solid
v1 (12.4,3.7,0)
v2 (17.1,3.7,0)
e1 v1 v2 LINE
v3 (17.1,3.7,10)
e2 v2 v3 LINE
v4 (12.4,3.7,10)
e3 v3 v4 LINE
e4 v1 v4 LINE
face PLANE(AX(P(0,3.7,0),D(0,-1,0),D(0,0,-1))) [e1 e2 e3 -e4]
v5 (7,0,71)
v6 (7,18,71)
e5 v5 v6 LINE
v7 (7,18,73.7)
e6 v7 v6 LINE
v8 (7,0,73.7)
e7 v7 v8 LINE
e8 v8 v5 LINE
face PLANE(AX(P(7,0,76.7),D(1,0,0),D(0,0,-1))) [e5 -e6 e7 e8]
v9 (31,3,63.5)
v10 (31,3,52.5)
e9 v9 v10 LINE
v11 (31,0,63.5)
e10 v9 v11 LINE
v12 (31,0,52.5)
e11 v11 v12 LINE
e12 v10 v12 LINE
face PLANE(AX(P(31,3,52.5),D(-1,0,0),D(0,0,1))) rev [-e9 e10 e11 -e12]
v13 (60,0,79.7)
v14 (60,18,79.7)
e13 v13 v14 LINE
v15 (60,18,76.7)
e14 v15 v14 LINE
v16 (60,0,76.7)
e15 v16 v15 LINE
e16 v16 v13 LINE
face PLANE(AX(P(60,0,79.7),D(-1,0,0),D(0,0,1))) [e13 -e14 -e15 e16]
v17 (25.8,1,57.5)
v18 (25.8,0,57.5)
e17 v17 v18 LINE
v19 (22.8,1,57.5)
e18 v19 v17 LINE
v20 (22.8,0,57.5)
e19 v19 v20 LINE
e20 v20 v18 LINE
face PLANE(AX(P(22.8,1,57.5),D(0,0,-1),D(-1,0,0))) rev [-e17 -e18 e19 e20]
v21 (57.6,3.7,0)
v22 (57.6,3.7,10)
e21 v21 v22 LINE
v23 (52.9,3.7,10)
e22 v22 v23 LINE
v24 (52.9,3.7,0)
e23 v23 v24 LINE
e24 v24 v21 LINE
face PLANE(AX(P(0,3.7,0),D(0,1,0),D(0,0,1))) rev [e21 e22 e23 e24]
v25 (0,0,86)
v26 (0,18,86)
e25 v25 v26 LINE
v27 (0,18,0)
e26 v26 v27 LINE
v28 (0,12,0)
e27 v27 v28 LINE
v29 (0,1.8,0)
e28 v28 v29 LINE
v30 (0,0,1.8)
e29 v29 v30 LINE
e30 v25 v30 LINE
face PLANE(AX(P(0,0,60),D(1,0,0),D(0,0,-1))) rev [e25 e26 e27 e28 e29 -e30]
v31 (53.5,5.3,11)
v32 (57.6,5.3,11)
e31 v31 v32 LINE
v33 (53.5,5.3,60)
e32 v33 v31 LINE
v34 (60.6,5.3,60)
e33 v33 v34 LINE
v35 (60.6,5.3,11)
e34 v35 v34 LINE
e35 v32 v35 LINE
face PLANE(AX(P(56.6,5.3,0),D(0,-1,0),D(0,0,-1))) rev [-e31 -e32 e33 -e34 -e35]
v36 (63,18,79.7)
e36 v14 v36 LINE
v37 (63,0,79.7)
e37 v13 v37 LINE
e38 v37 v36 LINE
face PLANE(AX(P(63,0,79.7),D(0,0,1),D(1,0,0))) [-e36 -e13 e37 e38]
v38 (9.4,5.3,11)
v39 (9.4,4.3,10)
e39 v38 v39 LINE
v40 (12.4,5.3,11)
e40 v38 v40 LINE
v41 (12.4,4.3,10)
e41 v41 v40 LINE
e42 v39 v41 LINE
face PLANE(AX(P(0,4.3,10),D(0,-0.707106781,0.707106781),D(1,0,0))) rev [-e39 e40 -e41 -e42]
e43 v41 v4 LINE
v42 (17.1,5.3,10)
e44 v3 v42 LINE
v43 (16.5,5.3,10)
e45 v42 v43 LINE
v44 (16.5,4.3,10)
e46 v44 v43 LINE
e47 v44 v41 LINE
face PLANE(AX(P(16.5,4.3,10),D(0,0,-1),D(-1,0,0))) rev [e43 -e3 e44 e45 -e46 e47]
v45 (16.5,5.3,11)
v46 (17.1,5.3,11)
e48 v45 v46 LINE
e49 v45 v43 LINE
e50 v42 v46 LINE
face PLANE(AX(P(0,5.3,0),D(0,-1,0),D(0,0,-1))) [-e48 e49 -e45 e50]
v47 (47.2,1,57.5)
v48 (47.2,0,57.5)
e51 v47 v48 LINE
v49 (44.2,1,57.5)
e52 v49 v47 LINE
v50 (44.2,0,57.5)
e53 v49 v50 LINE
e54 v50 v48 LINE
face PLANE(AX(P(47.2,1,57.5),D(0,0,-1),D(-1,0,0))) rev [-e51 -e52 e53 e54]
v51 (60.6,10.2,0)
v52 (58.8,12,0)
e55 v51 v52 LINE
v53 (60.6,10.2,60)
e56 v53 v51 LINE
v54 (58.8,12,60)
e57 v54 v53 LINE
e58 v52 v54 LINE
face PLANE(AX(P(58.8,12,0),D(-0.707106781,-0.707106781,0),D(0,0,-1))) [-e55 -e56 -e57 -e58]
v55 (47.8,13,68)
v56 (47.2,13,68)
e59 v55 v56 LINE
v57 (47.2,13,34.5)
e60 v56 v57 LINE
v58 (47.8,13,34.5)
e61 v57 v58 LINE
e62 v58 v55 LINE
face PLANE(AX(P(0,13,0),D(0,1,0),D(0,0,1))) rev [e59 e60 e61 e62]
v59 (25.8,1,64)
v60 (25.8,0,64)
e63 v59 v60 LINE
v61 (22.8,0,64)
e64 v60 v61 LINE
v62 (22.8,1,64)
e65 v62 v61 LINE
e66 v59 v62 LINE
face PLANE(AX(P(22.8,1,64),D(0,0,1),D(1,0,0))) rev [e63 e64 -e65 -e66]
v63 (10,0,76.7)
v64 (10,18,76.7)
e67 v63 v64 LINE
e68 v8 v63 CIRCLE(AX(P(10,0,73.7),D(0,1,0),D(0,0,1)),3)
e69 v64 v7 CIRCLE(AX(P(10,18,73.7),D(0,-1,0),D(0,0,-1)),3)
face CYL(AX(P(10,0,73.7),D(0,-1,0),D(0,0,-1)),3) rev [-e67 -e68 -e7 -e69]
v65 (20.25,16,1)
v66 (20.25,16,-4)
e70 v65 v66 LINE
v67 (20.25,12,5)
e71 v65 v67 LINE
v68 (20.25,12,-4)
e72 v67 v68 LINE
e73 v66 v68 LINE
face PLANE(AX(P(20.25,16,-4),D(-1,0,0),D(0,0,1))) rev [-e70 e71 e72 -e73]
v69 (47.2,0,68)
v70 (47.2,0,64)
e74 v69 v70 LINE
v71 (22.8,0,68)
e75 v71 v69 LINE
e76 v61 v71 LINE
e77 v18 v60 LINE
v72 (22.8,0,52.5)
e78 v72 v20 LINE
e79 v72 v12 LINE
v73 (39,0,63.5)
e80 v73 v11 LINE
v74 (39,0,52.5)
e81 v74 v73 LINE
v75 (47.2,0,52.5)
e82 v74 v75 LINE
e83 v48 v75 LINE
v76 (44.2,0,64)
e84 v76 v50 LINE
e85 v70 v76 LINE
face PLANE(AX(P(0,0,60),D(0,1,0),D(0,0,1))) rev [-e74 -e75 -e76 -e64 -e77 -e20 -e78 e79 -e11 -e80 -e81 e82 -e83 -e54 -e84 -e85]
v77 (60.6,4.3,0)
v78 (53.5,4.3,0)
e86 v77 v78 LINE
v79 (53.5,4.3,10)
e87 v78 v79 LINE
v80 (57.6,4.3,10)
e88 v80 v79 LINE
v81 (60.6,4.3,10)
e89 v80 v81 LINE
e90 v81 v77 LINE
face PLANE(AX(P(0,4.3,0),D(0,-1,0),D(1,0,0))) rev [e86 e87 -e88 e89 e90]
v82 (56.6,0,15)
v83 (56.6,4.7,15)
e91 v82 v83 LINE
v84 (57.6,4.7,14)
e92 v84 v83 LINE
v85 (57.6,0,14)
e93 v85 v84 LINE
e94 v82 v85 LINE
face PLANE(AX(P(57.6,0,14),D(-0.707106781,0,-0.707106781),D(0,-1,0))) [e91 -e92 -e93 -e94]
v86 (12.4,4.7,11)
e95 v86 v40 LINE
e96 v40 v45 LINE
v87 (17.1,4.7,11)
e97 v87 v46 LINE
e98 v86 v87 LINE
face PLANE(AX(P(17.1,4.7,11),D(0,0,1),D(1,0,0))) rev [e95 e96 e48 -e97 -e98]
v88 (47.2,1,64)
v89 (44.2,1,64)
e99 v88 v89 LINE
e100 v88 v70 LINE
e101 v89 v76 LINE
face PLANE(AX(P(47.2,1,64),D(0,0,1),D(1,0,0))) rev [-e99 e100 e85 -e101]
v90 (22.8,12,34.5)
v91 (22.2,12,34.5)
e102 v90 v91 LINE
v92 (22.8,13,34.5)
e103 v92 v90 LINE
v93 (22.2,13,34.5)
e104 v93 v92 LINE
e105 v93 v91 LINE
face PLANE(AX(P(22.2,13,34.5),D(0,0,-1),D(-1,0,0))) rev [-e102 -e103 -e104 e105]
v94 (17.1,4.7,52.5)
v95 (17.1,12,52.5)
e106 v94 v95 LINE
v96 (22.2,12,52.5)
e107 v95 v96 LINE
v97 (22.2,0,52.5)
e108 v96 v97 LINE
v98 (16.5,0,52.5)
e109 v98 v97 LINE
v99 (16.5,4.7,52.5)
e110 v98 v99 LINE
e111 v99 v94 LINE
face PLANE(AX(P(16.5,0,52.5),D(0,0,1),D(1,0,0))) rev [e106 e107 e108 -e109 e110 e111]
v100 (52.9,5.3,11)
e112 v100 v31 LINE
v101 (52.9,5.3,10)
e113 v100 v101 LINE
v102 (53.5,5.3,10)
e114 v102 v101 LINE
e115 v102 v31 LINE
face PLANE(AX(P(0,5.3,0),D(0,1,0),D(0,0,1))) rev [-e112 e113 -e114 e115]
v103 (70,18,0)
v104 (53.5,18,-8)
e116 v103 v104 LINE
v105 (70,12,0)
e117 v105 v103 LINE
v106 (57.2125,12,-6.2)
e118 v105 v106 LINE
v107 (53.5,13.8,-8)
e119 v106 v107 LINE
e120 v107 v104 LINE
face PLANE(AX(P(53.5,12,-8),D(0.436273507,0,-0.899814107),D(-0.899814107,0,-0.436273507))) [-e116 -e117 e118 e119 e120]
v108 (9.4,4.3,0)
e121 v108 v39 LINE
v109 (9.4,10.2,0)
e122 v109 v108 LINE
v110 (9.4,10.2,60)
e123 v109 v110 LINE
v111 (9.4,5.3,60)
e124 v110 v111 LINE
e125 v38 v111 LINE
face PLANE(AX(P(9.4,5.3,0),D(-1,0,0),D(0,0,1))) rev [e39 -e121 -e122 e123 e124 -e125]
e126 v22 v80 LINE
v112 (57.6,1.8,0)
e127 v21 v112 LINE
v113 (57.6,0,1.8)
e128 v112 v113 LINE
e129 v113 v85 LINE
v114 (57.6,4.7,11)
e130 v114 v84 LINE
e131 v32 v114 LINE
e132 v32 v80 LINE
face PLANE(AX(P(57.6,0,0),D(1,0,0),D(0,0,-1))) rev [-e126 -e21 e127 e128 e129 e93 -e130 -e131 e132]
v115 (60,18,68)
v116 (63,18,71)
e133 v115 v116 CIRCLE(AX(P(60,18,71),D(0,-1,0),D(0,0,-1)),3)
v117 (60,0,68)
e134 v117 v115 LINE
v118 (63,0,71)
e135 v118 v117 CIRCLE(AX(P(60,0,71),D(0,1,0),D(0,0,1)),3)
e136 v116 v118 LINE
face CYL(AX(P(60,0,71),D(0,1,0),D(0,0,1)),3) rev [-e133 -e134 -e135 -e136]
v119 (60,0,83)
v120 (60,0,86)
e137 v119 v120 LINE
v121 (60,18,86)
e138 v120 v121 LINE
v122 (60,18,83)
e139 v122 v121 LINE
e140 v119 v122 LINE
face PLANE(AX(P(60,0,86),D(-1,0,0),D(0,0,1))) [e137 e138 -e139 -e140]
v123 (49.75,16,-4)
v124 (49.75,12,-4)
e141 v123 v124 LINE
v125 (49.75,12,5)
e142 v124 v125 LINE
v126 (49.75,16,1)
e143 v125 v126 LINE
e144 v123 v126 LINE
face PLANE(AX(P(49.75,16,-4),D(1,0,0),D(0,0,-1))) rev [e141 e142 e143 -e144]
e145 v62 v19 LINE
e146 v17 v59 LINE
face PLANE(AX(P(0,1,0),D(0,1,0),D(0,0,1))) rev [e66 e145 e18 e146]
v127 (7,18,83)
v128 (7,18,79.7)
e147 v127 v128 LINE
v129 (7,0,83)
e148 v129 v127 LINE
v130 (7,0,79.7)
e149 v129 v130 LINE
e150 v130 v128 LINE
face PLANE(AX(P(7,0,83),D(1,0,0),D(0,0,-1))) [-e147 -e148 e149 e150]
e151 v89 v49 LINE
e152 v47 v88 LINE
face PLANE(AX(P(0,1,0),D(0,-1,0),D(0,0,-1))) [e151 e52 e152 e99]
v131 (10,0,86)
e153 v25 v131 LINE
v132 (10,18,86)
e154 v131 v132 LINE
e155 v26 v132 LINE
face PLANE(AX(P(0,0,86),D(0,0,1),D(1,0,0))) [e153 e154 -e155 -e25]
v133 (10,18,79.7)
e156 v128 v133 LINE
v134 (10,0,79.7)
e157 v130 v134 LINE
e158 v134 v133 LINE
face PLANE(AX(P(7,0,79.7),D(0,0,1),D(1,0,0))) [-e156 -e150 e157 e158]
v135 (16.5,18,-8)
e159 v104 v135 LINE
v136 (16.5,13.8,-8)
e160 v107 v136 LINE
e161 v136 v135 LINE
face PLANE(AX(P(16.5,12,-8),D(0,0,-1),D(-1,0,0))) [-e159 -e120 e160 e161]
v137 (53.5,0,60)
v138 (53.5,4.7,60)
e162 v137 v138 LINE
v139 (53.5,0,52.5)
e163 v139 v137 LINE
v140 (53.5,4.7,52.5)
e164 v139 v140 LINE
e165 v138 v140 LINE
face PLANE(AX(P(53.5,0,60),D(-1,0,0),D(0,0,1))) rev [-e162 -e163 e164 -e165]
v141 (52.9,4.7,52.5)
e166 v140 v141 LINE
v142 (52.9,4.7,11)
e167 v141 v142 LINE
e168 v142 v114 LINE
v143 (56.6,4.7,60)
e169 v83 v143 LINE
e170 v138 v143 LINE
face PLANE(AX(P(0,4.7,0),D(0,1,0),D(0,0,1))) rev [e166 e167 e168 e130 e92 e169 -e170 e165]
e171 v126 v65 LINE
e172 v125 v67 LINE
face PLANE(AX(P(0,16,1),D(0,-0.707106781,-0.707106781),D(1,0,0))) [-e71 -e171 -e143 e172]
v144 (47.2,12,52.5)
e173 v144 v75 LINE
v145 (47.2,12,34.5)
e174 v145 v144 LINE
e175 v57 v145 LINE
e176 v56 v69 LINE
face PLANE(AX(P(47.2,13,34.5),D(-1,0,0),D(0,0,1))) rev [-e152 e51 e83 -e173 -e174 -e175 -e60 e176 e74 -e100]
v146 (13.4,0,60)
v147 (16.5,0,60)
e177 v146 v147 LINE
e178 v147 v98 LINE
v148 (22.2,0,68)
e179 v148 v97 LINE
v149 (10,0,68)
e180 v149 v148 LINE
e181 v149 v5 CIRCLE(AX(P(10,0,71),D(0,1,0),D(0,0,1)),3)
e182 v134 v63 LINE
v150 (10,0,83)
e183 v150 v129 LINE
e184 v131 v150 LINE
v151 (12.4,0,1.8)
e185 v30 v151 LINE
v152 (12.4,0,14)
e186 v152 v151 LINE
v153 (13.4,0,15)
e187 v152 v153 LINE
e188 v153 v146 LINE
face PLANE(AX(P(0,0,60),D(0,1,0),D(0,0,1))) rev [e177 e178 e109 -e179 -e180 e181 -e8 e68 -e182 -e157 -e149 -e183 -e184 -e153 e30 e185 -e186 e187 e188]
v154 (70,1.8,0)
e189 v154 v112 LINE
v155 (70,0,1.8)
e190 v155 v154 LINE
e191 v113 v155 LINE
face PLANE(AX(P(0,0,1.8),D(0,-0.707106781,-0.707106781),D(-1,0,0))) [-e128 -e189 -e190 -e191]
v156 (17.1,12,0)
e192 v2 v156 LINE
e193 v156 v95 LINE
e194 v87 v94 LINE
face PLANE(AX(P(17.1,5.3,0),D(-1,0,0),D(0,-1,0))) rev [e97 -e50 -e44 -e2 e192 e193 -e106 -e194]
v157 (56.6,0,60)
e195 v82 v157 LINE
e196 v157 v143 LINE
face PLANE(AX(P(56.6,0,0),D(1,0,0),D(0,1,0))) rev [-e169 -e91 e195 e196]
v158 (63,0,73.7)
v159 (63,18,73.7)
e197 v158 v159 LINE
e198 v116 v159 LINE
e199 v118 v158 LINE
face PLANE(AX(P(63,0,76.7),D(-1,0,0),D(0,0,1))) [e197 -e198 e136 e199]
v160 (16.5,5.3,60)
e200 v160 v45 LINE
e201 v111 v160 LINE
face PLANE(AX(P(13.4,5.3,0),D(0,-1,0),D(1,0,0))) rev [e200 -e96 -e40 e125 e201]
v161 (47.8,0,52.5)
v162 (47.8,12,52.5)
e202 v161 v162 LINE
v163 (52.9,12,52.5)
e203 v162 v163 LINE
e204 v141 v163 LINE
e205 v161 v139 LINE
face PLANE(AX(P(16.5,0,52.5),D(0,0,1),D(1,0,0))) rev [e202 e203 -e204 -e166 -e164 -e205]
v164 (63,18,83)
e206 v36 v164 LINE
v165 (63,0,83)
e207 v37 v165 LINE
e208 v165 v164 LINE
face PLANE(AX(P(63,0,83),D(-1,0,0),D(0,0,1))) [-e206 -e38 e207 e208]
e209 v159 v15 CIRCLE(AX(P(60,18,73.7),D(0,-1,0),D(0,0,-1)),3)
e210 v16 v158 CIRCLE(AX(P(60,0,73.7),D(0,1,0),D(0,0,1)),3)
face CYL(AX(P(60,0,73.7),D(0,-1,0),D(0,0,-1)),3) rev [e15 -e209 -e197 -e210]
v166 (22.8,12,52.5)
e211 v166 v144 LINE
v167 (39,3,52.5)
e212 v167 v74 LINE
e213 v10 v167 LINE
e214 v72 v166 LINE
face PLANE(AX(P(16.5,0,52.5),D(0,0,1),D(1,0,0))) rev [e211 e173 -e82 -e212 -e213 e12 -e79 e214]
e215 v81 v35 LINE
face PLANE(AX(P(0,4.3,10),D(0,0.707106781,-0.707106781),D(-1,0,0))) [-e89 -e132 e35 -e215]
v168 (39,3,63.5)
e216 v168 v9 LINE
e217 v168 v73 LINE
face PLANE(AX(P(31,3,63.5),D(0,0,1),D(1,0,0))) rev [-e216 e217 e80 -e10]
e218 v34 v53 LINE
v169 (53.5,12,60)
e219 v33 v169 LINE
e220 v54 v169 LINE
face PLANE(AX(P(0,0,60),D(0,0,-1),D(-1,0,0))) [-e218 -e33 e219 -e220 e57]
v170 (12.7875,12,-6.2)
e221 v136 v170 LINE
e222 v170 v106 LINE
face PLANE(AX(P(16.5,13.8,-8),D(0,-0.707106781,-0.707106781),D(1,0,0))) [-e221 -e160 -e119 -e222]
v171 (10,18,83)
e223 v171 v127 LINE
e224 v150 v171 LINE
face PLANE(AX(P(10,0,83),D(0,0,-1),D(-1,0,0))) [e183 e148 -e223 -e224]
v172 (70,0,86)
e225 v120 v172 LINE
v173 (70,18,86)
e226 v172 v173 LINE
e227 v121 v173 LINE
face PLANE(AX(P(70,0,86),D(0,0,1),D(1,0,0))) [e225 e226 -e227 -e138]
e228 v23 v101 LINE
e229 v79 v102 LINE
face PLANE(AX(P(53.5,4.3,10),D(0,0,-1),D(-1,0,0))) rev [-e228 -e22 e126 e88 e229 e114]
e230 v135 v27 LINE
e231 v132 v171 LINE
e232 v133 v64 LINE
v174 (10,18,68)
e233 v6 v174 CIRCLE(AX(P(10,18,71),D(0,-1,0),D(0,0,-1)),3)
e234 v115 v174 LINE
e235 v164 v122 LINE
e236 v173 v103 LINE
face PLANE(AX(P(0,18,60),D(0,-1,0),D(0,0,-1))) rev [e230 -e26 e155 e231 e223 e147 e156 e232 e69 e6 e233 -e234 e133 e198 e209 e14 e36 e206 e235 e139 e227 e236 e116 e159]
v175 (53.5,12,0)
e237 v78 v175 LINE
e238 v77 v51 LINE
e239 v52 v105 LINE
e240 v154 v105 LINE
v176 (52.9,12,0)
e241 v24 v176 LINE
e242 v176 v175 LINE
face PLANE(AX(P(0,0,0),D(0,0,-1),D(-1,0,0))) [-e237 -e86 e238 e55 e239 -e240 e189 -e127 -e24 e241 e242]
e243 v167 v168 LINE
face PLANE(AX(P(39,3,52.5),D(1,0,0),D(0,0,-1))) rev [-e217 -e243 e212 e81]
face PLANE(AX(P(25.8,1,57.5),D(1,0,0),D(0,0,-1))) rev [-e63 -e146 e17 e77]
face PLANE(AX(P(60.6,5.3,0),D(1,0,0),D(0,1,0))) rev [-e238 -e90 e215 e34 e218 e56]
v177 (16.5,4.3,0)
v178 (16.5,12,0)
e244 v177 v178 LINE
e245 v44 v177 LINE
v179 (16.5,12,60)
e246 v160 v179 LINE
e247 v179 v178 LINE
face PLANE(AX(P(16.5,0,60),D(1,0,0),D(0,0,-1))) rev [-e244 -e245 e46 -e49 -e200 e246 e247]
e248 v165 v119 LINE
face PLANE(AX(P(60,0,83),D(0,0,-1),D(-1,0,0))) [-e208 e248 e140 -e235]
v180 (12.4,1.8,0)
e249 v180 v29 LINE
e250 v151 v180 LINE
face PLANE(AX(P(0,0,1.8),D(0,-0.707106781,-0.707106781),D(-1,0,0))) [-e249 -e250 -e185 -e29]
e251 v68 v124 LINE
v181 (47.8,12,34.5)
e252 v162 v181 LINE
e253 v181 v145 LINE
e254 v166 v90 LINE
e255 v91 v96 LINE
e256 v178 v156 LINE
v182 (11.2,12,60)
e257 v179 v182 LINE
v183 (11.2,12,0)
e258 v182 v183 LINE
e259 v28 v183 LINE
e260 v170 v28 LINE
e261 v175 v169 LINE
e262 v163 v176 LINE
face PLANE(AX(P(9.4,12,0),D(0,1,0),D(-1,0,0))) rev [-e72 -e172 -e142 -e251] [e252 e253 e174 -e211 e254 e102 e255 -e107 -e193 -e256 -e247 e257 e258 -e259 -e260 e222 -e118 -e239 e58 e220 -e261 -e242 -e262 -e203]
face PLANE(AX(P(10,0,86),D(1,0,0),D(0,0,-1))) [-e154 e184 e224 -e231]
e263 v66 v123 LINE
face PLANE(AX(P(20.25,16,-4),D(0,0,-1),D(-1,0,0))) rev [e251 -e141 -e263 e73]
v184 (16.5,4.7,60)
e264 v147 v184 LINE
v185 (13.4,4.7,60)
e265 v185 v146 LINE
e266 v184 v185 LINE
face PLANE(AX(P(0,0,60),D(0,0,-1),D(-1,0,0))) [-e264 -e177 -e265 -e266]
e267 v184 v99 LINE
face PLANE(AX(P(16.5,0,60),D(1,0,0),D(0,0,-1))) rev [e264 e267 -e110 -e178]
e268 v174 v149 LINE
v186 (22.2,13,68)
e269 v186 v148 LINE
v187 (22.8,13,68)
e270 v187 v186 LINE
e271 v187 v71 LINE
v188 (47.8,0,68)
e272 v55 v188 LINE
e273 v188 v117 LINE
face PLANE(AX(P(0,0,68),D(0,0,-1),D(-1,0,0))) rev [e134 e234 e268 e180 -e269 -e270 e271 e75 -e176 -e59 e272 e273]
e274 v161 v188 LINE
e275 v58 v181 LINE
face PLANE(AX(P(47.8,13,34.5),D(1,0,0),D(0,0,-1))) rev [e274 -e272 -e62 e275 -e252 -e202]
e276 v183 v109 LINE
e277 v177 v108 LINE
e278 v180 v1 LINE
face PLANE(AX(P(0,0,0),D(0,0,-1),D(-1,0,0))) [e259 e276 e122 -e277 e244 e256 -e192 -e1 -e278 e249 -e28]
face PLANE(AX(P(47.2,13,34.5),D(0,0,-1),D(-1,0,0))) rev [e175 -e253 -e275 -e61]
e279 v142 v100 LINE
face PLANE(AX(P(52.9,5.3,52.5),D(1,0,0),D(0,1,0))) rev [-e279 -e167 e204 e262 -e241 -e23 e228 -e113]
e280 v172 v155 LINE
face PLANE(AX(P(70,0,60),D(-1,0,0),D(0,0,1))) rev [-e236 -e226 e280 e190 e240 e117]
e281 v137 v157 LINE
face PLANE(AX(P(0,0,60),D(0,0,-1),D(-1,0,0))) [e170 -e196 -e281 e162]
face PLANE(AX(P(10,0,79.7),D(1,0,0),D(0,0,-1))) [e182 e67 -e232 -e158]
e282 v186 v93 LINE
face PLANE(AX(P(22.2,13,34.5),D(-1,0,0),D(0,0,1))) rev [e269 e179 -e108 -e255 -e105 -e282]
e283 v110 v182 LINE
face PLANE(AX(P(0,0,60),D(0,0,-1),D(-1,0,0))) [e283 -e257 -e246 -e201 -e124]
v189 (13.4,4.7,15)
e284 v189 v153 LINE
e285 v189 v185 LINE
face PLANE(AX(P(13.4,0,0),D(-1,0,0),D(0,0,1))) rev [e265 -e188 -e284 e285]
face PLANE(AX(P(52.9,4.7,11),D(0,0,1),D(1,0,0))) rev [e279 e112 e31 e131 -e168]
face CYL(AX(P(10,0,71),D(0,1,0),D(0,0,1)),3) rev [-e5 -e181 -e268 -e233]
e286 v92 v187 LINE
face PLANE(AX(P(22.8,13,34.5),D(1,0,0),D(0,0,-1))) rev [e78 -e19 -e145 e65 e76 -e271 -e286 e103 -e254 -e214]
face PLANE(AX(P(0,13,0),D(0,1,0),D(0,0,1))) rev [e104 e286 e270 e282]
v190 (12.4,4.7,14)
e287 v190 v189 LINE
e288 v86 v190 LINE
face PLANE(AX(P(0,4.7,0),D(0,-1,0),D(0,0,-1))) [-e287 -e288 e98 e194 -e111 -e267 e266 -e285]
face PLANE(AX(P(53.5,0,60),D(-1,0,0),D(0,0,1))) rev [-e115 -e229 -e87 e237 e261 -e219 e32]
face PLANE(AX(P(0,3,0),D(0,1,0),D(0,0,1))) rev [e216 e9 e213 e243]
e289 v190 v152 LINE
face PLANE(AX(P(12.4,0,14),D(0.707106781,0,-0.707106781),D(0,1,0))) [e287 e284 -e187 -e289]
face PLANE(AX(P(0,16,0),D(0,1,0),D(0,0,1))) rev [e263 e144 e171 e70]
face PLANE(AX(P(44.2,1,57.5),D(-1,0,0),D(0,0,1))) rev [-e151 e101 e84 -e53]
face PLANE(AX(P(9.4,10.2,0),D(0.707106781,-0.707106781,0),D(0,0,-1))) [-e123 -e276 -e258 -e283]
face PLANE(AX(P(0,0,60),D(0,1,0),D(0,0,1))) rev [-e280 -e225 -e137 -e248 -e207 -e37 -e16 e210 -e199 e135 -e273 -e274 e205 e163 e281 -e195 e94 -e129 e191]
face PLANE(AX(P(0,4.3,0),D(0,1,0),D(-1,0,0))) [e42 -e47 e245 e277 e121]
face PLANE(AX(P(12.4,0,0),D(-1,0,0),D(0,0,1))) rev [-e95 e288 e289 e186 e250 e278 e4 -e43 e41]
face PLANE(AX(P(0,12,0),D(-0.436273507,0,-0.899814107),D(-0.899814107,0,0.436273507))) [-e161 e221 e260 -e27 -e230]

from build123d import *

# Parameters (mm, degrees)
SKETCH_1_W           = 70
SKETCH_1_H           = 18
EXTRUDE_1_DEPTH      = 60
CUT_EXTRUDE_1_DEPTH  = 94.936148527
SKETCH_3_W           = 15
SKETCH_3_H           = 5.3
CUT_EXTRUDE_2_DEPTH  = 1
SKETCH_4_W           = 15
SKETCH_4_H           = 5.3
CUT_EXTRUDE_3_DEPTH  = 1
SKETCH_5_W           = 3
SKETCH_5_H           = 11
CUT_EXTRUDE_4_DEPTH  = 1
SKETCH_6_W           = 3
SKETCH_6_H           = 11
CUT_EXTRUDE_5_DEPTH  = 1
CHAMFER_1_SIZE       = 1
EXTRUDE_9_DEPTH      = 6
SKETCH_7_W           = 29.5
SKETCH_7_H           = 9
CUT_EXTRUDE_7_DEPTH  = 4
SKETCH_9_W           = 37
SKETCH_9_H           = 7.5
EXTRUDE_3_DEPTH      = 12
SKETCH_10_W          = 70
SKETCH_10_H          = 18
EXTRUDE_4_DEPTH      = 8
CHAMFER_4_SIZE       = 4
SKETCH_11_W          = 8
SKETCH_11_H          = 11
CUT_EXTRUDE_8_DEPTH  = 3
SKETCH_12_W          = 0.6
SKETCH_12_H          = 33.5
CUT_EXTRUDE_9_DEPTH  = 13
SKETCH_13_W          = 0.6
SKETCH_13_H          = 52.5
EXTRUDE_5_DEPTH      = 6.7
SKETCH_14_W          = 0.6
SKETCH_14_H          = 10
EXTRUDE_6_DEPTH      = 1
SKETCH_15_W          = 7.7
SKETCH_15_H          = 49
EXTRUDE_7_DEPTH      = 0.6
SKETCH_18_W          = 7.7
SKETCH_18_H          = 10
EXTRUDE_8_DEPTH      = 0.6
CHAMFER_5_SIZE       = 1.8
SKETCH_22_W          = 3
SKETCH_22_H          = 6.5
CUT_EXTRUDE_10_DEPTH = 1
EXTRUDE_10_DEPTH     = 18
FILLET_1_R           = 3


with BuildPart() as part:
    # 草图1 → 凸台-拉伸1 (new body)
    with BuildSketch(Plane.XY):
        with Locations((35, 9)):
            Rectangle(SKETCH_1_W, SKETCH_1_H)
    extrude(amount=EXTRUDE_1_DEPTH)

    # 草图2 → 切除-拉伸1 (cut, through all)
    with BuildSketch(Plane.XY.offset(60)):
        Polygon((13.4, 0), (13.4, 5.3), (9.4, 5.3), (9.4, 12), (60.6, 12), (60.6, 5.3), (56.6, 5.3), (56.6, 0), align=None)
    extrude(amount=-CUT_EXTRUDE_1_DEPTH, mode=Mode.SUBTRACT)

    # 草图3 → 切除-拉伸2 (cut)
    with BuildSketch(Plane(origin=(13.4, 0, 0), x_dir=(0, 0, -1), z_dir=(1, 0, 0))):
        with Locations((-7.5, 2.65)):
            Rectangle(SKETCH_3_W, SKETCH_3_H)
    extrude(amount=-CUT_EXTRUDE_2_DEPTH, mode=Mode.SUBTRACT)

    # 草图4 → 切除-拉伸3 (cut)
    with BuildSketch(Plane.ZY.offset(-56.6)):
        with Locations((7.5, 2.65)):
            Rectangle(SKETCH_4_W, SKETCH_4_H)
    extrude(amount=-CUT_EXTRUDE_3_DEPTH, mode=Mode.SUBTRACT)

    # 草图5 → 切除-拉伸4 (cut)
    with BuildSketch(Plane(origin=(0, 5.3, 0), x_dir=(1, 0, 0), z_dir=(0, 1, 0))):
        with Locations((59.1, -5.5)):
            Rectangle(SKETCH_5_W, SKETCH_5_H)
    extrude(amount=-CUT_EXTRUDE_4_DEPTH, mode=Mode.SUBTRACT)

    # 草图6 → 切除-拉伸5 (cut)
    with BuildSketch(Plane(origin=(0, 5.3, 0), x_dir=(1, 0, 0), z_dir=(0, 1, 0))):
        with Locations((10.9, -5.5)):
            Rectangle(SKETCH_6_W, SKETCH_6_H)
    extrude(amount=-CUT_EXTRUDE_5_DEPTH, mode=Mode.SUBTRACT)

    # 倒角1
    chamfer_1_edges = [part.edges().sort_by_distance(p)[0] for p in [
        (59.1, 4.3, 11),
        (10.9, 4.3, 11),
        (12.4, 2.65, 15),
        (57.6, 2.65, 15),
    ]]
    chamfer(chamfer_1_edges, length=CHAMFER_1_SIZE - 0.0001)  # a hair under: the kernel refuses the full size

    # 草图21 → 凸台-拉伸9 (add)
    with BuildSketch(Plane(origin=(0, 18, 0), x_dir=(1, 0, 0), z_dir=(0, 1, 0))):
        Polygon((0, 0), (16.5, 8), (53.5, 8), (70, 0), align=None)
    extrude(amount=-EXTRUDE_9_DEPTH)

    # 草图7 → 切除-拉伸7 (cut)
    with BuildSketch(Plane.XZ.offset(-12)):
        with Locations((35, 0.5)):
            Rectangle(SKETCH_7_W, SKETCH_7_H)
    extrude(amount=-CUT_EXTRUDE_7_DEPTH, mode=Mode.SUBTRACT)

    # 草图9 → 凸台-拉伸3 (add)
    with BuildSketch(Plane.XZ.offset(-12)):
        with Locations((35, 56.25)):
            Rectangle(SKETCH_9_W, SKETCH_9_H)
    extrude(amount=EXTRUDE_3_DEPTH)

    # 草图10 → 凸台-拉伸4 (add)
    with BuildSketch(Plane.XY.offset(60)):
        with Locations((35, 9)):
            Rectangle(SKETCH_10_W, SKETCH_10_H)
    extrude(amount=EXTRUDE_4_DEPTH)

    # 倒角4
    chamfer_4_edges = [part.edges().sort_by_distance(p)[0] for p in [
        (35, 16, 5),
    ]]
    chamfer(chamfer_4_edges, length=CHAMFER_4_SIZE - 0.0001)  # a hair under: the kernel refuses the full size

    # 草图11 → 切除-拉伸8 (cut)
    with BuildSketch(Plane.XZ):
        with Locations((35, 58)):
            Rectangle(SKETCH_11_W, SKETCH_11_H)
    extrude(amount=-CUT_EXTRUDE_8_DEPTH, mode=Mode.SUBTRACT)

    # 草图12 → 切除-拉伸9 (cut)
    with BuildSketch(Plane.XZ):
        with Locations((22.5, 51.25)):
            Rectangle(SKETCH_12_W, SKETCH_12_H)
        with Locations((47.5, 51.25)):
            Rectangle(SKETCH_12_W, SKETCH_12_H)
    extrude(amount=-CUT_EXTRUDE_9_DEPTH, mode=Mode.SUBTRACT)

    # 草图13 → 凸台-拉伸5 (add)
    with BuildSketch(Plane.XZ.offset(-12)):
        with Locations((16.8, 26.25)):
            Rectangle(SKETCH_13_W, SKETCH_13_H)
        with Locations((53.2, 26.25)):
            Rectangle(SKETCH_13_W, SKETCH_13_H)
    extrude(amount=EXTRUDE_5_DEPTH)

    # 草图14 → 凸台-拉伸6 (add)
    with BuildSketch(Plane.XZ.offset(-5.3)):
        with Locations((16.8, 5)):
            Rectangle(SKETCH_14_W, SKETCH_14_H)
        with Locations((53.2, 5)):
            Rectangle(SKETCH_14_W, SKETCH_14_H)
    extrude(amount=EXTRUDE_6_DEPTH)

    # 草图15 → 凸台-拉伸7 (add)
    with BuildSketch(Plane.XZ.offset(-5.3)):
        with Locations((13.25, 35.5)):
            Rectangle(SKETCH_15_W, SKETCH_15_H)
        with Locations((56.75, 35.5)):
            Rectangle(SKETCH_15_W, SKETCH_15_H)
    extrude(amount=EXTRUDE_7_DEPTH)

    # 草图18 → 凸台-拉伸8 (add)
    with BuildSketch(Plane.XZ.offset(-4.3)):
        with Locations((13.25, 5)):
            Rectangle(SKETCH_18_W, SKETCH_18_H)
        with Locations((56.75, 5)):
            Rectangle(SKETCH_18_W, SKETCH_18_H)
    extrude(amount=EXTRUDE_8_DEPTH)

    # 倒角5
    chamfer_5_edges = [part.edges().sort_by_distance(p)[0] for p in [
        (35, 12, -8),
        (9.4, 12, 30),
        (60.6, 12, 30),
        (6.2, 0, 0),
        (63.8, 0, 0),
    ]]
    chamfer(chamfer_5_edges, length=CHAMFER_5_SIZE)

    # 草图22 → 切除-拉伸10 (cut)
    with BuildSketch(Plane.XZ):
        with Locations((24.3, 60.75)):
            Rectangle(SKETCH_22_W, SKETCH_22_H)
        with Locations((45.7, 60.75)):
            Rectangle(SKETCH_22_W, SKETCH_22_H)
    extrude(amount=-CUT_EXTRUDE_10_DEPTH, mode=Mode.SUBTRACT)

    # 草图23 → 凸台-拉伸10 (add)
    with BuildSketch(Plane(origin=(0, 18, 0), x_dir=(1, 0, 0), z_dir=(0, 1, 0))):
        Polygon((0, -68), (0, -86), (10, -86), (10, -83), (7, -83), (7, -79.7), (10, -79.7), (10, -76.7), (7, -76.7), (7, -68), align=None)
        Polygon((63, -68), (70, -68), (70, -86), (60, -86), (60, -83), (63, -83), (63, -79.7), (60, -79.7), (60, -76.7), (63, -76.7), align=None)
    extrude(amount=-EXTRUDE_10_DEPTH)

    # 圆角1
    fillet_1_edges = [part.edges().sort_by_distance(p)[0] for p in [
        (7, 9, 76.7),
        (7, 9, 68),
        (63, 9, 68),
        (63, 9, 76.7),
    ]]
    fillet(fillet_1_edges, radius=FILLET_1_R - 0.0001)  # a hair under: the kernel refuses the full size


solid = part.part
